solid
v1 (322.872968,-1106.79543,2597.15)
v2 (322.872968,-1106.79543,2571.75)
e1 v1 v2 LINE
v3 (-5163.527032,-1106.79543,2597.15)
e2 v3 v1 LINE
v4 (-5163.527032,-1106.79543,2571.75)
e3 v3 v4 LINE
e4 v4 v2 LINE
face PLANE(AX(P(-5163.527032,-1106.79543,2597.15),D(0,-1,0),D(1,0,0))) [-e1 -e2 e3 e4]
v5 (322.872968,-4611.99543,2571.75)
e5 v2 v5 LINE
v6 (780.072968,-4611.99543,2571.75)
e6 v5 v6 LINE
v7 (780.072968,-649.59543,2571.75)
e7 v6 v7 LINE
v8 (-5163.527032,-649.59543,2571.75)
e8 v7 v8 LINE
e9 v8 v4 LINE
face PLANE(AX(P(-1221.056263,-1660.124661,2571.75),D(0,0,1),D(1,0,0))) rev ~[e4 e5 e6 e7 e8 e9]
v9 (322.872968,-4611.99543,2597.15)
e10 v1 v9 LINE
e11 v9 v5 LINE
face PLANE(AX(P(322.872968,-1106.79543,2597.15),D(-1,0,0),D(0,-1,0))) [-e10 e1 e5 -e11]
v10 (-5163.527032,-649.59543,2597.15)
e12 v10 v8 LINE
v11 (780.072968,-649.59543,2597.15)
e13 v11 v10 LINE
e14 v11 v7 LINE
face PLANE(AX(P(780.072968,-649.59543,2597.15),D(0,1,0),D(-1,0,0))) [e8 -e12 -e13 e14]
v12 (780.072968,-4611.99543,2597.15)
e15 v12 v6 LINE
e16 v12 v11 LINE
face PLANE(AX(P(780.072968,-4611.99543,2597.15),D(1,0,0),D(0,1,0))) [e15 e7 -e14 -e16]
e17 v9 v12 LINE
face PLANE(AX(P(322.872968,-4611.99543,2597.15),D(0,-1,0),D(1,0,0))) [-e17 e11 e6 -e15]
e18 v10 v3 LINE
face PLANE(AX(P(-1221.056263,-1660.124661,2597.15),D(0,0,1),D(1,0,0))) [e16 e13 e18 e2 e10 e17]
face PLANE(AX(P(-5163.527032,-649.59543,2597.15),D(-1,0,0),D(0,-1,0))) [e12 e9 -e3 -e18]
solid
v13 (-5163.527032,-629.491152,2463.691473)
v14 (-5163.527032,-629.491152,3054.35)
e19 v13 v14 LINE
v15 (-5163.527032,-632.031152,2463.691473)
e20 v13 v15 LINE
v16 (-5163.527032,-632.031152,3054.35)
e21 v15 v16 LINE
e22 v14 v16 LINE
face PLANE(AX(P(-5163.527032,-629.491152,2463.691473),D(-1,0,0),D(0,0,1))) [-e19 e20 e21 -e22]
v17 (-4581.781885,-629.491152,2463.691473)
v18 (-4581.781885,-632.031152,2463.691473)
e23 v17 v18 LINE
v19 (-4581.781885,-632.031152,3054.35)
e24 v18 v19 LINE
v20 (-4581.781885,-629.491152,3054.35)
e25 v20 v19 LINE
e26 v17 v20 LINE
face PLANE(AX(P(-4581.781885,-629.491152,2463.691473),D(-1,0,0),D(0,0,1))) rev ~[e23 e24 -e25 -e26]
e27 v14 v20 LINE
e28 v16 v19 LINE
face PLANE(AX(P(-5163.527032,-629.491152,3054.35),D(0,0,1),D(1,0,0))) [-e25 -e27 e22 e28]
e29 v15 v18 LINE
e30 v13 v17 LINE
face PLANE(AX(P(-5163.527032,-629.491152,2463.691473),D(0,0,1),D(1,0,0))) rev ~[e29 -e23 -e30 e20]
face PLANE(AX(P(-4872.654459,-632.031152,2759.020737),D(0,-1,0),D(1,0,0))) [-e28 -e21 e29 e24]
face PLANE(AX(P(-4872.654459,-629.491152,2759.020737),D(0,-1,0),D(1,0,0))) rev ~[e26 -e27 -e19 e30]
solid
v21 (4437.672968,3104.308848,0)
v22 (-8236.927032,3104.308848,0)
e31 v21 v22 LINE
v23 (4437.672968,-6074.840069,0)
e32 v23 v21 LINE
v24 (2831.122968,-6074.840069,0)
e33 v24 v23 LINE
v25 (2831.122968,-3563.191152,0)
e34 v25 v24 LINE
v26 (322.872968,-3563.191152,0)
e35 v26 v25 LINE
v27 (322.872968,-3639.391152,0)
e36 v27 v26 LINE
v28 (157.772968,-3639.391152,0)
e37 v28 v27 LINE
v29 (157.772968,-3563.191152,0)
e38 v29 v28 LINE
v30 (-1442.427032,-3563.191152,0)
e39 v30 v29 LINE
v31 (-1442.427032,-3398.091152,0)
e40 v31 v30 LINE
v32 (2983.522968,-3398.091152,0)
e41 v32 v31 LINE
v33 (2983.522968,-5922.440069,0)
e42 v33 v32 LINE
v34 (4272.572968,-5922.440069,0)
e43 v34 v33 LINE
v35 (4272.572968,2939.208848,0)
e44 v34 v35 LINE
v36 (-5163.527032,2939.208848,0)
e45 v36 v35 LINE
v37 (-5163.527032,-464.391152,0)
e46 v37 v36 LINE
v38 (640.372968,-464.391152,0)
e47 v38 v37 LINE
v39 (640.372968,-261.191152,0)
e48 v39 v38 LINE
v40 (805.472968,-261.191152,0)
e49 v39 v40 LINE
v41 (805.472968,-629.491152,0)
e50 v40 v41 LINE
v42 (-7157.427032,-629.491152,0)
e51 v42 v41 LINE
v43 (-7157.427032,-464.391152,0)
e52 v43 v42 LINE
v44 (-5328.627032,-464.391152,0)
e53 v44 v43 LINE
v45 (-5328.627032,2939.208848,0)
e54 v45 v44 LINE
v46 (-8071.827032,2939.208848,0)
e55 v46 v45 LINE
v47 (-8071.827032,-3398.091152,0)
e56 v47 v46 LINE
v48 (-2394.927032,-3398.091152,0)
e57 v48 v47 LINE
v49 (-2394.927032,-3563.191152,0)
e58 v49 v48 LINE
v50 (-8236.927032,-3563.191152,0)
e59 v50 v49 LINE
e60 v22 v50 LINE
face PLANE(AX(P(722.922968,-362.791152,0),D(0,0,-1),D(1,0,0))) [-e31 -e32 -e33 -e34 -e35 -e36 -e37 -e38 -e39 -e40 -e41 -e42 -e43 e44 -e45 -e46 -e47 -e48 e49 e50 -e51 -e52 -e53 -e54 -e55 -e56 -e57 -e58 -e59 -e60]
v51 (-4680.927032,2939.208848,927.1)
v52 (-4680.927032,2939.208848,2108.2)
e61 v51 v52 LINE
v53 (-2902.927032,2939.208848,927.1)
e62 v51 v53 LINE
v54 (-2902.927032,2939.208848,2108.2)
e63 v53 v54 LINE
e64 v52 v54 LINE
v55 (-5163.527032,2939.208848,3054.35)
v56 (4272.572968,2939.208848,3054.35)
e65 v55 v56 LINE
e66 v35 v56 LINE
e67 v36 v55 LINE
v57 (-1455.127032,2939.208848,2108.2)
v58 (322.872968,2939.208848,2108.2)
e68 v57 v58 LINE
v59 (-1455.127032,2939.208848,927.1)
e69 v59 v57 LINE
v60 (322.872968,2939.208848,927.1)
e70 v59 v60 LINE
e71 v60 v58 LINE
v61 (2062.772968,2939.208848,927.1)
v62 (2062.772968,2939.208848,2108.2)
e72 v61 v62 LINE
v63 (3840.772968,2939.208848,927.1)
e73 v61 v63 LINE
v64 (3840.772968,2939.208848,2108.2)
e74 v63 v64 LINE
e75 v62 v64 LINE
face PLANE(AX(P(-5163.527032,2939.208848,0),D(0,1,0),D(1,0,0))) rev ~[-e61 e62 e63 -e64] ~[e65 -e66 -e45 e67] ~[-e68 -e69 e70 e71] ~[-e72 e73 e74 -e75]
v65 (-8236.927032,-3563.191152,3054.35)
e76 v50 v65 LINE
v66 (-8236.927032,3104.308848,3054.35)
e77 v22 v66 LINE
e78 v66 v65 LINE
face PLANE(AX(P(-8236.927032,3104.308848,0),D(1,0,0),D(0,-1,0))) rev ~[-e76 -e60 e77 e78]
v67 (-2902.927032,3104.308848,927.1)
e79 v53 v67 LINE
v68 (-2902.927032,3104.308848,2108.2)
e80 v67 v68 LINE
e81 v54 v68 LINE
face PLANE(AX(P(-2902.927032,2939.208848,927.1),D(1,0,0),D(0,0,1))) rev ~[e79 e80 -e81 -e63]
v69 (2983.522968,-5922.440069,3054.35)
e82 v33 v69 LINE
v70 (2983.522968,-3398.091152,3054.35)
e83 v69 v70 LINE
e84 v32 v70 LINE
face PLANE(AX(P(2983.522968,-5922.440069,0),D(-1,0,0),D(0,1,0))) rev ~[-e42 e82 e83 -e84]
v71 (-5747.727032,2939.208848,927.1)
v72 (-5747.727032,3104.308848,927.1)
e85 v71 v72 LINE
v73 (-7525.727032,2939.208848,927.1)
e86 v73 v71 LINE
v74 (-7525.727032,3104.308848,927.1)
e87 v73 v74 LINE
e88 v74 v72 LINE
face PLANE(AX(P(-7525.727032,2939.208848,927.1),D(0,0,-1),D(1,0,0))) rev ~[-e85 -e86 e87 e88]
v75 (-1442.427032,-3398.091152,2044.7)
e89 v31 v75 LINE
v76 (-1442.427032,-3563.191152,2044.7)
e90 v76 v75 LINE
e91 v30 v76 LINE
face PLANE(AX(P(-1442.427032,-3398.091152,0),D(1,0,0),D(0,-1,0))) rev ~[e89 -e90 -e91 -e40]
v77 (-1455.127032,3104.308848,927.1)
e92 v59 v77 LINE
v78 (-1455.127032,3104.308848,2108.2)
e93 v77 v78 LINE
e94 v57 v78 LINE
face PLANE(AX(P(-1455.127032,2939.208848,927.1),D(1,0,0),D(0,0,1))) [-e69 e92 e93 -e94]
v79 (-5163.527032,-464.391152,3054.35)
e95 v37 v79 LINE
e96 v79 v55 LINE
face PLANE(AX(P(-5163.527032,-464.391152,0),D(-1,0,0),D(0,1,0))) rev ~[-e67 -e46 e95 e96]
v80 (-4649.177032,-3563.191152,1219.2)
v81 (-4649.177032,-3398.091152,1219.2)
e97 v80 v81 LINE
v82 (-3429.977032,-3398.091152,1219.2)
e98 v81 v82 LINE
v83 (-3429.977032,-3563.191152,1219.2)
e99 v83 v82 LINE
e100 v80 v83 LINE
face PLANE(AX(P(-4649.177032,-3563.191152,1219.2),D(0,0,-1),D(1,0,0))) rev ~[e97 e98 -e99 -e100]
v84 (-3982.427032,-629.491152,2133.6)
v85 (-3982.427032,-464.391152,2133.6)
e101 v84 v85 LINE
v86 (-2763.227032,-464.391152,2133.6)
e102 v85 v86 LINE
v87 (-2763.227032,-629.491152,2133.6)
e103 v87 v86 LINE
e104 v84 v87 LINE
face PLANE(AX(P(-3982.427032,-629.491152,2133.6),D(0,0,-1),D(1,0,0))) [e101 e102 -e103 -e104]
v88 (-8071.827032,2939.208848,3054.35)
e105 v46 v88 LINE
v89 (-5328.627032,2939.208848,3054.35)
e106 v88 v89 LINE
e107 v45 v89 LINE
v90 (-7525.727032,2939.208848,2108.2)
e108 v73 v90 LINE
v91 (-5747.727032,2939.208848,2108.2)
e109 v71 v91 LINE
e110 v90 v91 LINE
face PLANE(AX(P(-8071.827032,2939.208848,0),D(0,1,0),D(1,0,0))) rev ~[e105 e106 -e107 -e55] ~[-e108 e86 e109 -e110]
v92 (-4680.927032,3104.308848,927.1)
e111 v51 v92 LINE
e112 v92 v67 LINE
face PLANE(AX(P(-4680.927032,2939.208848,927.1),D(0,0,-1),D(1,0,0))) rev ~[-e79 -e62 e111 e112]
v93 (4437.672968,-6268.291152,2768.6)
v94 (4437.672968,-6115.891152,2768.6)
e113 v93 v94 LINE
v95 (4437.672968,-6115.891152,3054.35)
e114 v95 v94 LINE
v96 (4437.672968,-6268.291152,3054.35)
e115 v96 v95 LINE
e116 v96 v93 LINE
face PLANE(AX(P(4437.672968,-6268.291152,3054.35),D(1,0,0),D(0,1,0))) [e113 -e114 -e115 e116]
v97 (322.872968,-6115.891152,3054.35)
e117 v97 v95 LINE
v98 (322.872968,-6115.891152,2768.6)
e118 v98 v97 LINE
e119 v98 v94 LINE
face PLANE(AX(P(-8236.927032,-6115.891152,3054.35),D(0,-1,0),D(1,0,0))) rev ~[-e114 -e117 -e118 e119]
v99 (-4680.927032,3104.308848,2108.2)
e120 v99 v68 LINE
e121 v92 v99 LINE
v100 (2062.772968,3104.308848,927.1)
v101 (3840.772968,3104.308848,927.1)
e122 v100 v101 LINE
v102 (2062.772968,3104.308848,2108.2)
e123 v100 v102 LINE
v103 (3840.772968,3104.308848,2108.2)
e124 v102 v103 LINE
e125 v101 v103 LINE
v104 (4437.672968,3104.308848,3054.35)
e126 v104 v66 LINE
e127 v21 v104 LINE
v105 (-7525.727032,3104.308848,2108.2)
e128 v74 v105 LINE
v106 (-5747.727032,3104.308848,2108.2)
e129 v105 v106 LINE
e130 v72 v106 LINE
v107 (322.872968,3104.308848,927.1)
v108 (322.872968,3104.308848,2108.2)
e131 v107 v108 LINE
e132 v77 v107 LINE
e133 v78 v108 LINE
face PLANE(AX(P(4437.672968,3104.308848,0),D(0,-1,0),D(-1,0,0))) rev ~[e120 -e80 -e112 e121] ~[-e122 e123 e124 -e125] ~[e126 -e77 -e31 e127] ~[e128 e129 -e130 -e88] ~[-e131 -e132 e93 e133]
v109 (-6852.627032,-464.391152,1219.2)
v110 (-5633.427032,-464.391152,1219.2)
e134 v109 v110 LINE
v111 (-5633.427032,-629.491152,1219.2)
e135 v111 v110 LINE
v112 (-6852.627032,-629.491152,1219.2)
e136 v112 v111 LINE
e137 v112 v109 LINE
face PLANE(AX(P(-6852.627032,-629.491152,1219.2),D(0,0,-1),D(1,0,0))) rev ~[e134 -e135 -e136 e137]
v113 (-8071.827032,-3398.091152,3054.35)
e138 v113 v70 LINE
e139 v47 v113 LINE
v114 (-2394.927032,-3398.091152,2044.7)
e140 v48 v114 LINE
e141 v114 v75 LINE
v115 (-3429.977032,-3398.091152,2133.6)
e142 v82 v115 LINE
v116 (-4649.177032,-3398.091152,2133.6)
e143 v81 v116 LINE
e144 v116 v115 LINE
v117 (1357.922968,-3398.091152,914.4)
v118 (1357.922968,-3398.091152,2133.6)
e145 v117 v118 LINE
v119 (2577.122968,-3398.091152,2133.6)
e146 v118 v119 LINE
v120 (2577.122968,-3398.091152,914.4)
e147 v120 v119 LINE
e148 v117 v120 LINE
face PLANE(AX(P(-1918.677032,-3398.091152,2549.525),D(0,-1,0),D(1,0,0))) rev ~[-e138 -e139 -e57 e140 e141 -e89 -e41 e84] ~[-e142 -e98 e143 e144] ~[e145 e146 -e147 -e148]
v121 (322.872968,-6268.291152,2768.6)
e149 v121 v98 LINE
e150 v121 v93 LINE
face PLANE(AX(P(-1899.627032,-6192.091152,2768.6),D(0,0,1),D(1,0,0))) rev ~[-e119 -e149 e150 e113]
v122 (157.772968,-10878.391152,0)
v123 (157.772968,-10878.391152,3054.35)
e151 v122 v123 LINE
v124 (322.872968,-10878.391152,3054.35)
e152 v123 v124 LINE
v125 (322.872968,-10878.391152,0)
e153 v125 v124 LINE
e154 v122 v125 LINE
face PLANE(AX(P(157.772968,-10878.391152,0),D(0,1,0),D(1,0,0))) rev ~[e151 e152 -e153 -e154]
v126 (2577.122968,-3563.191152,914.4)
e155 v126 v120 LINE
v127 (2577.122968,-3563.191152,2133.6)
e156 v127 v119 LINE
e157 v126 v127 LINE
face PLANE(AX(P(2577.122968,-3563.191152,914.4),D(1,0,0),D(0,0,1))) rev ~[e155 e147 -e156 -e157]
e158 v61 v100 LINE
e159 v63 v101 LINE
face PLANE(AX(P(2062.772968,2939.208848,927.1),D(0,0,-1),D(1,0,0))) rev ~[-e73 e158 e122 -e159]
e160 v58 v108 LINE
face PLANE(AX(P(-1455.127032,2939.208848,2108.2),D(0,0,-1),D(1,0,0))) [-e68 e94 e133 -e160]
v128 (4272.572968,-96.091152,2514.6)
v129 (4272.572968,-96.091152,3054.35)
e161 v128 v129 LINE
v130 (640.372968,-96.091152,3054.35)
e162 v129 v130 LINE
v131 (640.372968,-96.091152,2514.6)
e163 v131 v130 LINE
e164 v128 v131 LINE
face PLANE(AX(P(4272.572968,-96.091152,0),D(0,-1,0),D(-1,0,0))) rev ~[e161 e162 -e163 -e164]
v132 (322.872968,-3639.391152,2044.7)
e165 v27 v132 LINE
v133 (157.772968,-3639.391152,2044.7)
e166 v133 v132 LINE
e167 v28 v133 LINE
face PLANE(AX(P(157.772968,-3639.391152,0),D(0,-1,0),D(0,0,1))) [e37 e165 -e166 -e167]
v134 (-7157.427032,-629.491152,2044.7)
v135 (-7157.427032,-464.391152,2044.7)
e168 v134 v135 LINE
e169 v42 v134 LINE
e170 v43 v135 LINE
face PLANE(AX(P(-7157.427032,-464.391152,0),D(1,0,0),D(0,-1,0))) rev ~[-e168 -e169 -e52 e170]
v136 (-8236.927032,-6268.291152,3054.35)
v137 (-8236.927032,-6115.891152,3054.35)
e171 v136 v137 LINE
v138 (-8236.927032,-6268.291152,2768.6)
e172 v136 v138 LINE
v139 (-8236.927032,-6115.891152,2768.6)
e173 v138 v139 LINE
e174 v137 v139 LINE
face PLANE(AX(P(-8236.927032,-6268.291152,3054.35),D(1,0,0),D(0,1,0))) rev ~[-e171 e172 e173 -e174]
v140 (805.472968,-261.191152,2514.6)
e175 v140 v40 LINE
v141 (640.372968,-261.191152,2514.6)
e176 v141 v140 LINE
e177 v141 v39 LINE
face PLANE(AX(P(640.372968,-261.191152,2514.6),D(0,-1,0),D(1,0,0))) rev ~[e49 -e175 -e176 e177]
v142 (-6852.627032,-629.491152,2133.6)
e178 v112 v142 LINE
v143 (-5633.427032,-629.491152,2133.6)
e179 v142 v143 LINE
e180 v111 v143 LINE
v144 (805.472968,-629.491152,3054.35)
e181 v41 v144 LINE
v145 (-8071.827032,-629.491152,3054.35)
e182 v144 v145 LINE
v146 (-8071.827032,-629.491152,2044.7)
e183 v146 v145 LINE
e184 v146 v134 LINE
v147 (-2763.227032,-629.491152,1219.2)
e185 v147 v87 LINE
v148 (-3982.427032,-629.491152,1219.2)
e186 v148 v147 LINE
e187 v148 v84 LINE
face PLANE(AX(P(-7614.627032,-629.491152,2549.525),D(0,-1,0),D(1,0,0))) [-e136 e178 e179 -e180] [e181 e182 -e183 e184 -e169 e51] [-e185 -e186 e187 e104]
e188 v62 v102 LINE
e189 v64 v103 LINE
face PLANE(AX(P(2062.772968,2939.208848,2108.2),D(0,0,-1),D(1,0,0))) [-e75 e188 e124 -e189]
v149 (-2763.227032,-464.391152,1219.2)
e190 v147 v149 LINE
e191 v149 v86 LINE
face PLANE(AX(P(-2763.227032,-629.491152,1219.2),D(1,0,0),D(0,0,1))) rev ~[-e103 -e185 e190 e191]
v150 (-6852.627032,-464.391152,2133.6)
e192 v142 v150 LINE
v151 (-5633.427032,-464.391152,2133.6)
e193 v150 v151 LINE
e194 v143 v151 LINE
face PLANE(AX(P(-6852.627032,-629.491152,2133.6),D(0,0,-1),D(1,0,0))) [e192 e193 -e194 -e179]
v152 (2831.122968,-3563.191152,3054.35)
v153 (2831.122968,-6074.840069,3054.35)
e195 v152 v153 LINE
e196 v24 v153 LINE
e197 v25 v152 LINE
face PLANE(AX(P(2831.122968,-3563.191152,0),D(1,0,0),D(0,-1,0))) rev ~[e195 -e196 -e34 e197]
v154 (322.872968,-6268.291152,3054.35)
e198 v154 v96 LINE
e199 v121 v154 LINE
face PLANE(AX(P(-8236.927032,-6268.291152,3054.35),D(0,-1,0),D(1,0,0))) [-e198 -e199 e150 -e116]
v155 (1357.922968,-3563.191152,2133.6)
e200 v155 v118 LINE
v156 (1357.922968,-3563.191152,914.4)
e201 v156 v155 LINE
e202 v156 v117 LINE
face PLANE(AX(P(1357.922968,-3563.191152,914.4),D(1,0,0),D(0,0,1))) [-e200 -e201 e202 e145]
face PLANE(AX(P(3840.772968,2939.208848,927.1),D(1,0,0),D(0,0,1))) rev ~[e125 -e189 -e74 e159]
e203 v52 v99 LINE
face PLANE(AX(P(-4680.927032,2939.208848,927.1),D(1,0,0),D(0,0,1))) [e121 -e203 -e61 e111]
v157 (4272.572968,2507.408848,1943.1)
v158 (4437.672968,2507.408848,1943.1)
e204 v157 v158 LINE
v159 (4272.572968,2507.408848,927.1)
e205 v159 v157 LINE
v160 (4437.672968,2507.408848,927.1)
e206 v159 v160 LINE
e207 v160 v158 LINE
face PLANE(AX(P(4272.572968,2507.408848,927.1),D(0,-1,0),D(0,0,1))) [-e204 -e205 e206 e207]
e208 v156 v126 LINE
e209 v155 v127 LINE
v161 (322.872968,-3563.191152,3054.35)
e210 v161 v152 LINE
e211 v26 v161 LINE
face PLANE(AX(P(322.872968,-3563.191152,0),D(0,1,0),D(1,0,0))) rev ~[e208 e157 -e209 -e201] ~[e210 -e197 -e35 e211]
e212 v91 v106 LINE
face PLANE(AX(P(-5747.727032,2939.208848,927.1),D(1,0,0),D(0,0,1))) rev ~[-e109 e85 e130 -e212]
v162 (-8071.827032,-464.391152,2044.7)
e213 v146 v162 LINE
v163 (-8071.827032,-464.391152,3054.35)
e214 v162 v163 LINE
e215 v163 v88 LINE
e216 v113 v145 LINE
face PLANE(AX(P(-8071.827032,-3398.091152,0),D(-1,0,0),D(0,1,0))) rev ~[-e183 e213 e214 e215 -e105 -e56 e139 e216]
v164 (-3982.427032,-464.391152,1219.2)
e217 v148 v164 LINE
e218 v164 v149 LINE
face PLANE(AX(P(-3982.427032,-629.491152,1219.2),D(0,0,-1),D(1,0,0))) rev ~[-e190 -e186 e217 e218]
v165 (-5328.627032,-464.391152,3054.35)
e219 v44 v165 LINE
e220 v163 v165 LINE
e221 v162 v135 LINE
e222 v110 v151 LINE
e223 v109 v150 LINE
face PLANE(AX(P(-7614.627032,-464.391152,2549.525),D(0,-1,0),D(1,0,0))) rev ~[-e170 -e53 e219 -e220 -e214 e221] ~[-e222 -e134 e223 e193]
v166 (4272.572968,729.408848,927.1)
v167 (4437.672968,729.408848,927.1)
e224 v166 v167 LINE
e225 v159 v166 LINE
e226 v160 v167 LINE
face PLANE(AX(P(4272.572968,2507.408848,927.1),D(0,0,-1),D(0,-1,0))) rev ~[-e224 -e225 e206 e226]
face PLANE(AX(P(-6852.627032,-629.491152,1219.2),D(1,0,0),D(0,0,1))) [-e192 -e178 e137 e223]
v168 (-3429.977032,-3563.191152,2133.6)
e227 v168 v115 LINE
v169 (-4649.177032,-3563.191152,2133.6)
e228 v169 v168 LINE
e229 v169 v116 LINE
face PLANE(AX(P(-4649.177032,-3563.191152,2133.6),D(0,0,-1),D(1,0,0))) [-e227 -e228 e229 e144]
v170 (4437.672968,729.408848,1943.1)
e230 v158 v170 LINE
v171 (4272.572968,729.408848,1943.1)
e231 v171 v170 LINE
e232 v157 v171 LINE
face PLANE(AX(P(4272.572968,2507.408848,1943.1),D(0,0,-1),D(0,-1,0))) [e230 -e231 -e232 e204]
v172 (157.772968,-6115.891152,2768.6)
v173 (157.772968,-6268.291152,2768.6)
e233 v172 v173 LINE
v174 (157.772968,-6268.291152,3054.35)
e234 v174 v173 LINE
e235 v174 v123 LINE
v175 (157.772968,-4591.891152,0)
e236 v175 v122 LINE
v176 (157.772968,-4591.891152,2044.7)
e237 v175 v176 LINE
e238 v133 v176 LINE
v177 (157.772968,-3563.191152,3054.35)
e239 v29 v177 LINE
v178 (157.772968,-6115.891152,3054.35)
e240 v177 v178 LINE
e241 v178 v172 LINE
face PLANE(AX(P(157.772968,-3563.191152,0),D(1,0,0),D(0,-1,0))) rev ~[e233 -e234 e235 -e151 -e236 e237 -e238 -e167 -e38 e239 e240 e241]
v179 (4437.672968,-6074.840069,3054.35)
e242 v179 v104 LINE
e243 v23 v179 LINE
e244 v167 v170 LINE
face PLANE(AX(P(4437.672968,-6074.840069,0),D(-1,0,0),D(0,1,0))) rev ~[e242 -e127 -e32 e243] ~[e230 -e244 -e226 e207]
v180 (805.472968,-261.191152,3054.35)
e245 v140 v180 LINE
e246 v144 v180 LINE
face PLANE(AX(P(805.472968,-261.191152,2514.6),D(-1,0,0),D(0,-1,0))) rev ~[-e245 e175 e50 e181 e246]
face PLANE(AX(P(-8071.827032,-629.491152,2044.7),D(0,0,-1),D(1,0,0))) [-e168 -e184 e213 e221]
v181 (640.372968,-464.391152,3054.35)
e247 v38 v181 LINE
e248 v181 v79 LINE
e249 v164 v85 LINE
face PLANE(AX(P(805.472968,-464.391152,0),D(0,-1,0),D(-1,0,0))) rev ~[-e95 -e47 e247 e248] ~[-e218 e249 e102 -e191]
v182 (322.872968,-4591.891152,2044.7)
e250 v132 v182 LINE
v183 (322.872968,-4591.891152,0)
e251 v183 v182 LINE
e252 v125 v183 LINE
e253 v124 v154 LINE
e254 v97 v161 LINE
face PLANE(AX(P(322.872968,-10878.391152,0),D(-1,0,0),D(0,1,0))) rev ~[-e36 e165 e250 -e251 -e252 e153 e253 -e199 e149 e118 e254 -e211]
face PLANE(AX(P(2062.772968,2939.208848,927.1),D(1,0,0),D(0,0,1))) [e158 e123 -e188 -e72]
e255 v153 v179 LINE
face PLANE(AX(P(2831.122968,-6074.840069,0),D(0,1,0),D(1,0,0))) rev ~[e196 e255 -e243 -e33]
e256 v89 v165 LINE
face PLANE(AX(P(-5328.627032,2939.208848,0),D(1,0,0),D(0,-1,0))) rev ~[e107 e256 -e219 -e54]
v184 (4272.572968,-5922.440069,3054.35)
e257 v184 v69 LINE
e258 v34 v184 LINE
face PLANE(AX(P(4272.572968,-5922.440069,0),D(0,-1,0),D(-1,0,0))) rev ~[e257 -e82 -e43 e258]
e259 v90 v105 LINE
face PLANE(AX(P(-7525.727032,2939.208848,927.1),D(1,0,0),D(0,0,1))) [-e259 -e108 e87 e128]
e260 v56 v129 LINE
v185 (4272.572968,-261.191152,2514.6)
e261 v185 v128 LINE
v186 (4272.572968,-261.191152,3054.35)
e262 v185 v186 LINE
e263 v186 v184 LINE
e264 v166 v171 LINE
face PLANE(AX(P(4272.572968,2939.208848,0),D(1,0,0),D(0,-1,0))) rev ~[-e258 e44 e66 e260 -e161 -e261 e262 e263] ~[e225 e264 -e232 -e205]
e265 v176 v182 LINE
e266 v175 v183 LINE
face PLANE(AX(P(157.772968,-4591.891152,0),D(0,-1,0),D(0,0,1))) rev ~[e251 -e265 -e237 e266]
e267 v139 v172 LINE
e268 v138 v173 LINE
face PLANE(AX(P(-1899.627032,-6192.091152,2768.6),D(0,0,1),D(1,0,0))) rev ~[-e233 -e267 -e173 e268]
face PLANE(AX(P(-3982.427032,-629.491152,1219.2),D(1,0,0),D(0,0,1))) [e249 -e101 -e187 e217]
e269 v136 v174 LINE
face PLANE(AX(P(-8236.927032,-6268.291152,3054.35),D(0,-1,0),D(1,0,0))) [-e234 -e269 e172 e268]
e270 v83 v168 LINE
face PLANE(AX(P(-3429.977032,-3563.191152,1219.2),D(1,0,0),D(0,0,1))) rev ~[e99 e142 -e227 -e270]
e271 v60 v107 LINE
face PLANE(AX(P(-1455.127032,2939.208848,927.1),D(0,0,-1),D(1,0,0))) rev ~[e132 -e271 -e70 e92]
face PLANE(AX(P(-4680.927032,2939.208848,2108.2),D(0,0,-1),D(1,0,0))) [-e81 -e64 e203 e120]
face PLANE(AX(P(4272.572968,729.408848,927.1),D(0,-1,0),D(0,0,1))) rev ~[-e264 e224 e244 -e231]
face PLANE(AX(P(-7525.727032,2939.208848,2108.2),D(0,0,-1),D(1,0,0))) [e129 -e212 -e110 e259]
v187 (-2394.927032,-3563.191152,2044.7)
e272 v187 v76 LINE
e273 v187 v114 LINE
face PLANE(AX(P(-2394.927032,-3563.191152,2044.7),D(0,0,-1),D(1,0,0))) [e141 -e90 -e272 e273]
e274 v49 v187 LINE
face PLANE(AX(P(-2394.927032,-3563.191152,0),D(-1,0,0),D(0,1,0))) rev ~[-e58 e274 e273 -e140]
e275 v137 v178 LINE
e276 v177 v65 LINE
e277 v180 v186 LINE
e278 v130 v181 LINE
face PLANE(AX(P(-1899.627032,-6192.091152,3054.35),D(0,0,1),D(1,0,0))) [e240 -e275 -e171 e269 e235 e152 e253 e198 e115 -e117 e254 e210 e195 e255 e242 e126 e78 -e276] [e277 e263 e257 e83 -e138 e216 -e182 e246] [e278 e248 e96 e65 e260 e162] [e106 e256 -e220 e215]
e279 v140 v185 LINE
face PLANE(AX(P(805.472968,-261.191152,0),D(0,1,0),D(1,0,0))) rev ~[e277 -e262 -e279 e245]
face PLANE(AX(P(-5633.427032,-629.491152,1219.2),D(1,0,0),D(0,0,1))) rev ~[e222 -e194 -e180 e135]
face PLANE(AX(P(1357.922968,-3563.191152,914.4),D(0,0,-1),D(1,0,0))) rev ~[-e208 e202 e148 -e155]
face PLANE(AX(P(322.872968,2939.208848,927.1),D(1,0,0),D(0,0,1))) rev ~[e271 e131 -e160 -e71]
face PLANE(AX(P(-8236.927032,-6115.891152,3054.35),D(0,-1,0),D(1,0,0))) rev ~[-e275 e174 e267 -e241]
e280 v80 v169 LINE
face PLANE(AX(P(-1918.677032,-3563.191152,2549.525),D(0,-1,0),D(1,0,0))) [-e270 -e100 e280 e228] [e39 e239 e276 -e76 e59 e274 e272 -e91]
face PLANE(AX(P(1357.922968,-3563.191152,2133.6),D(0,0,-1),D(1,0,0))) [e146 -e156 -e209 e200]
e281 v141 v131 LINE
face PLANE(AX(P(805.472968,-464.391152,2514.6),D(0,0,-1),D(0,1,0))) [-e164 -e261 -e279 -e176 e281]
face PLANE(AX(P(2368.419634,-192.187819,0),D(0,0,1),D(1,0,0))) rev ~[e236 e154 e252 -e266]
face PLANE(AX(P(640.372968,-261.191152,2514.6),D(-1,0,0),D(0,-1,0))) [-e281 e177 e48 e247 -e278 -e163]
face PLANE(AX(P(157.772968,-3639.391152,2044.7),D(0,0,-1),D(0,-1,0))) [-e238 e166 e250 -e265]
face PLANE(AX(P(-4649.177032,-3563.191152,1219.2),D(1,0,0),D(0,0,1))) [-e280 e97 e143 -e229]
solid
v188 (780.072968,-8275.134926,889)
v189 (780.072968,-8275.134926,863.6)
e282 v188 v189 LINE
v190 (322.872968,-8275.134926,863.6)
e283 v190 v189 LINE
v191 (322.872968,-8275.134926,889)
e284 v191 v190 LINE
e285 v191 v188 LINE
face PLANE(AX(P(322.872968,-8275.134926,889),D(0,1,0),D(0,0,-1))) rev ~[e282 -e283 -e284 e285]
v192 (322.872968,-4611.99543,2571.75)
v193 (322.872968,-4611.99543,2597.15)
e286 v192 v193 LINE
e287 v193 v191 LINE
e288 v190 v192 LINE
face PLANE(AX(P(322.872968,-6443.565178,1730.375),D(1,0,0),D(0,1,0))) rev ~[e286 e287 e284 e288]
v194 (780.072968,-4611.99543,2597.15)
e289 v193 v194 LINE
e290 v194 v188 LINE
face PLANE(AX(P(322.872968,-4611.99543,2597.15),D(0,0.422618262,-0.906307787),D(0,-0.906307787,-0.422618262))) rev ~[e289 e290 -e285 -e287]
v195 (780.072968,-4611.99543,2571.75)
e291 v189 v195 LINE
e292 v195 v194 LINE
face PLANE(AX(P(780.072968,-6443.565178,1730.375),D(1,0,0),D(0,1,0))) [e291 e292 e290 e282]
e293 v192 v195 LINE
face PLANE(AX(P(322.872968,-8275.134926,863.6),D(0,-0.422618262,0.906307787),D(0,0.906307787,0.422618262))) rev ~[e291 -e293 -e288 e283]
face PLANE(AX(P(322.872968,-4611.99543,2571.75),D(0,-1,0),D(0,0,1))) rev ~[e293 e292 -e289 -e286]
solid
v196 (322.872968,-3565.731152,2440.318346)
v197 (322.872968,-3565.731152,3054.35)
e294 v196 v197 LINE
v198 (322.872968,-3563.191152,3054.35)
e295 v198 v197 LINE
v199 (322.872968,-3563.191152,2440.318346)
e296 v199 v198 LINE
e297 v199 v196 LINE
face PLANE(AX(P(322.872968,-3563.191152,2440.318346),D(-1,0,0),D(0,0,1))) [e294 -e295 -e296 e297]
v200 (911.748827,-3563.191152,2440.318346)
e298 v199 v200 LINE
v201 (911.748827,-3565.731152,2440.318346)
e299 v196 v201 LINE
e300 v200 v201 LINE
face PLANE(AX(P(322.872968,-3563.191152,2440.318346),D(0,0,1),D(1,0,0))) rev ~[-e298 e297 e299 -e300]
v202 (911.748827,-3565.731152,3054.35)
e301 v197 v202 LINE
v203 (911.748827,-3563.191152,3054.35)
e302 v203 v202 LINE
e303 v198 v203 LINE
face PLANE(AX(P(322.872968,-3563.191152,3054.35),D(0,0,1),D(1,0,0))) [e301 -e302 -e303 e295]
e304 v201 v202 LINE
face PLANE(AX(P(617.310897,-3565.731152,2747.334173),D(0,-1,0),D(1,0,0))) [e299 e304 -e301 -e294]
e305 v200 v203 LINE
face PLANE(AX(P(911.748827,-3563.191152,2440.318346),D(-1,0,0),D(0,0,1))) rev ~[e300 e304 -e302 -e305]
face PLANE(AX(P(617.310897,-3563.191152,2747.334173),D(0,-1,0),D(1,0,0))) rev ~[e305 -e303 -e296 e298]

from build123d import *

# Parameters (mm, degrees)
F1_DEPTH  = 3054.35
F2_W      = 1219.2
F2_H      = 914.4
F3_DEPTH  = 165.1
F4_W      = 1778
F4_H      = 1181.1
F5_DEPTH  = 165.101
F6_W      = 1778
F6_H      = 1016
F7_DEPTH  = 165.101
F11_DEPTH = 3054.35
F12_W     = 3467.1
F12_H     = 2514.6
F13_DEPTH = 165.1
F14_W     = 952.5
F14_H     = 2044.7
F15_DEPTH = 165.1
F16_W     = 914.4
F16_H     = 1009.65
F17_DEPTH = 165.1
F18_W     = 952.5
F18_H     = 1009.65
F19_DEPTH = 165.1
F20_W     = 12674.6
F20_H     = 152.4
F21_DEPTH = 285.75
F22_W     = 1219.2
F22_H     = 1219.2
F22_H_2   = 914.4
F23_DEPTH = 165.1
F24_W     = 368.3
F24_H     = 2514.6
F25_DEPTH = 165.1
F26_W     = 165.1
F26_H     = 203.2
F27_DEPTH = 2514.6
F30_DEPTH = 25.4
F32_DEPTH = 457.2
F33_W     = 588.8758589745
F33_H     = 614.0316539764
F34_DEPTH = 2.54
F35_W     = 581.7451477051
F35_H     = 590.6585269928
F36_DEPTH = 2.54


with BuildPart() as f1:
    # F0 (on Top) → F1 (new body)
    with BuildSketch(Plane.XY):
        Polygon((-8071.8270324707, -464.391151869), (-8071.8270324707, 2939.208848131), (-5328.6270324707, 2939.208848131), (-5328.6270324707, -464.391151869), (-7157.4270324707, -464.391151869), (-7157.4270324707, -629.491151869), (-5163.5270324707, -629.491151869), (-4249.1270324707, -629.491151869), (805.4729675293, -629.491151869), (805.4729675293, -464.391151869), (640.3729675293, -464.391151869), (-4249.1270324707, -464.391151869), (-5163.5270324707, -464.391151869), (-5163.5270324707, 2939.208848131), (4272.5729675293, 2939.208848131), (4272.5729675293, 48.6404670191), (4272.5729675293, -116.4595329809), (4272.5729675293, -3398.091151869), (4272.5729675293, -5922.4400688171), (2983.5229675293, -5922.4400688171), (2983.5229675293, -3398.091151869), (-1442.4270324707, -3398.091151869), (-1442.4270324707, -3563.191151869), (157.7729675293, -3563.191151869), (157.7729675293, -10878.391151869), (322.8729675293, -10878.391151869), (322.8729675293, -3563.191151869), (2831.1229675293, -3563.191151869), (2831.1229675293, -6074.8400688171), (4437.6729675293, -6074.8400688171), (4437.6729675293, -3398.091151869), (4437.6729675293, 3104.308848131), (-8236.9270324707, 3104.308848131), (-8236.9270324707, -3563.191151869), (-2394.9270324707, -3563.191151869), (-2394.9270324707, -3398.091151869), (-8071.8270324707, -3398.091151869), (-8071.8270324707, -629.491151869), align=None)
    extrude(amount=F1_DEPTH)

    # F2 (on face) → F3 (cut, through all)
    with BuildSketch(Plane.XZ.offset(629.491151869)):
        with Locations((-6243.0270324707, 1676.4)):
            Rectangle(F2_W, F2_H)
        with Locations((-3372.8270324707, 1676.4)):
            Rectangle(F2_W, F2_H)
    extrude(amount=-F3_DEPTH, mode=Mode.SUBTRACT)

    # F4 (on face) → F5 (cut, through all)
    with BuildSketch(Plane.XZ.offset(-2939.208848131)):
        with Locations((-6636.7270324707, 1517.65)):
            Rectangle(F4_W, F4_H)
        with Locations((-3791.9270324707, 1517.65)):
            Rectangle(F4_W, F4_H)
        with Locations((-566.1270324707, 1517.65)):
            Rectangle(F4_W, F4_H)
        with Locations((2951.7729675293, 1517.65)):
            Rectangle(F4_W, F4_H)
    extrude(amount=-F5_DEPTH, mode=Mode.SUBTRACT)

    # F6 (on face) → F7 (cut, through all)
    with BuildSketch(Plane(origin=(4272.5729675293, 0, 0), x_dir=(0, -1, 0), z_dir=(-1, 0, 0))):
        with Locations((-1618.408848131, 1435.1)):
            Rectangle(F6_W, F6_H)
    extrude(amount=-F7_DEPTH, mode=Mode.SUBTRACT)

    # F10 (on Top) → F11 (join, through all)
    with BuildSketch(Plane.XY):
        Polygon((4272.5729675293, -96.091151869), (640.3729675293, -96.091151869), (640.3729675293, -464.391151869), (805.4729675293, -464.391151869), (805.4729675293, -261.191151869), (4272.5729675293, -261.191151869), align=None)
    extrude(amount=F11_DEPTH)

    # F12 (on face) → F13 (cut, through all)
    with BuildSketch(Plane.XZ.offset(261.191151869)):
        with Locations((2539.0229675293, 1257.3)):
            Rectangle(F12_W, F12_H)
    extrude(amount=-F13_DEPTH, mode=Mode.SUBTRACT)

    # F14 (on face) → F15 (cut, through all)
    with BuildSketch(Plane(origin=(157.7729675293, 0, 0), x_dir=(0, -1, 0), z_dir=(-1, 0, 0))):
        with Locations((4115.641151869, 1022.35)):
            Rectangle(F14_W, F14_H)
    extrude(amount=-F15_DEPTH, mode=Mode.SUBTRACT)

    # F16 (on face) → F17 (join)
    with BuildSketch(Plane.XZ.offset(629.491151869)):
        with Locations((-7614.6270324707, 2549.525)):
            Rectangle(F16_W, F16_H)
    extrude(amount=-F17_DEPTH)

    # F18 (on face) → F19 (join)
    with BuildSketch(Plane.XZ.offset(3563.191151869)):
        with Locations((-1918.6770324707, 2549.525)):
            Rectangle(F18_W, F18_H)
    extrude(amount=-F19_DEPTH)

    # F20 (on face) → F21 (join)
    with BuildSketch(Plane.XY.offset(3054.35)):
        with Locations((-1899.6270324707, -6192.091151869)):
            Rectangle(F20_W, F20_H)
    extrude(amount=-F21_DEPTH)

    # F22 (on face) → F23 (cut, through all)
    with BuildSketch(Plane.XZ.offset(3563.191151869)):
        with Locations((1967.5229675293, 1524)):
            Rectangle(F22_W, F22_H)
        with Locations((-4039.5770324707, 1676.4)):
            Rectangle(F22_W, F22_H_2)
    extrude(amount=-F23_DEPTH, mode=Mode.SUBTRACT)

    # F24 (on face) → F25 (cut, through all)
    with BuildSketch(Plane.YZ.offset(805.4729675293)):
        with Locations((-280.241151869, 1257.3)):
            Rectangle(F24_W, F24_H)
    extrude(amount=-F25_DEPTH, mode=Mode.SUBTRACT)

    # F26 (on face) → F27 (join, through all)
    with BuildSketch(Plane(origin=(0, 0, 2514.6), x_dir=(1, 0, 0), z_dir=(0, 0, -1))):
        with Locations((722.9229675293, 362.791151869)):
            Rectangle(F26_W, F26_H)
    extrude(amount=F27_DEPTH)


with BuildPart() as f30:
    # F29 (on offset) → F30 (new body)
    with BuildSketch(Plane.XY.offset(2597.15)):
        Polygon((322.8729675293, -649.5954301834), (-5163.5270324707, -649.5954301834), (-5163.5270324707, -1106.7954301834), (322.8729675293, -1106.7954301834), (322.8729675293, -4611.9954301834), (780.0729675293, -4611.9954301834), (780.0729675293, -649.5954301834), align=None)
    extrude(amount=-F30_DEPTH)


with BuildPart() as f32:
    # F31 (on face) → F32 (new body)
    with BuildSketch(Plane.YZ.offset(322.8729675293)):
        Polygon((-8275.1349264518, 863.6), (-4611.9954301834, 2571.75), (-4611.9954301834, 2597.15), (-8275.1349264518, 889), align=None)
    extrude(amount=F32_DEPTH)


with BuildPart() as f34:
    # F33 (on face) → F34 (new body)
    with BuildSketch(Plane.XZ.offset(3563.191151869)):
        with Locations((617.3108970165, 2747.3341730118)):
            Rectangle(F33_W, F33_H)
    extrude(amount=F34_DEPTH)


with BuildPart() as f36:
    # F35 (on face) → F36 (new body)
    with BuildSketch(Plane.XZ.offset(629.491151869)):
        with Locations((-4872.6544586182, 2759.0207365036)):
            Rectangle(F35_W, F35_H)
    extrude(amount=F36_DEPTH)


solid = Compound([f1.part, f30.part, f32.part, f34.part, f36.part])
